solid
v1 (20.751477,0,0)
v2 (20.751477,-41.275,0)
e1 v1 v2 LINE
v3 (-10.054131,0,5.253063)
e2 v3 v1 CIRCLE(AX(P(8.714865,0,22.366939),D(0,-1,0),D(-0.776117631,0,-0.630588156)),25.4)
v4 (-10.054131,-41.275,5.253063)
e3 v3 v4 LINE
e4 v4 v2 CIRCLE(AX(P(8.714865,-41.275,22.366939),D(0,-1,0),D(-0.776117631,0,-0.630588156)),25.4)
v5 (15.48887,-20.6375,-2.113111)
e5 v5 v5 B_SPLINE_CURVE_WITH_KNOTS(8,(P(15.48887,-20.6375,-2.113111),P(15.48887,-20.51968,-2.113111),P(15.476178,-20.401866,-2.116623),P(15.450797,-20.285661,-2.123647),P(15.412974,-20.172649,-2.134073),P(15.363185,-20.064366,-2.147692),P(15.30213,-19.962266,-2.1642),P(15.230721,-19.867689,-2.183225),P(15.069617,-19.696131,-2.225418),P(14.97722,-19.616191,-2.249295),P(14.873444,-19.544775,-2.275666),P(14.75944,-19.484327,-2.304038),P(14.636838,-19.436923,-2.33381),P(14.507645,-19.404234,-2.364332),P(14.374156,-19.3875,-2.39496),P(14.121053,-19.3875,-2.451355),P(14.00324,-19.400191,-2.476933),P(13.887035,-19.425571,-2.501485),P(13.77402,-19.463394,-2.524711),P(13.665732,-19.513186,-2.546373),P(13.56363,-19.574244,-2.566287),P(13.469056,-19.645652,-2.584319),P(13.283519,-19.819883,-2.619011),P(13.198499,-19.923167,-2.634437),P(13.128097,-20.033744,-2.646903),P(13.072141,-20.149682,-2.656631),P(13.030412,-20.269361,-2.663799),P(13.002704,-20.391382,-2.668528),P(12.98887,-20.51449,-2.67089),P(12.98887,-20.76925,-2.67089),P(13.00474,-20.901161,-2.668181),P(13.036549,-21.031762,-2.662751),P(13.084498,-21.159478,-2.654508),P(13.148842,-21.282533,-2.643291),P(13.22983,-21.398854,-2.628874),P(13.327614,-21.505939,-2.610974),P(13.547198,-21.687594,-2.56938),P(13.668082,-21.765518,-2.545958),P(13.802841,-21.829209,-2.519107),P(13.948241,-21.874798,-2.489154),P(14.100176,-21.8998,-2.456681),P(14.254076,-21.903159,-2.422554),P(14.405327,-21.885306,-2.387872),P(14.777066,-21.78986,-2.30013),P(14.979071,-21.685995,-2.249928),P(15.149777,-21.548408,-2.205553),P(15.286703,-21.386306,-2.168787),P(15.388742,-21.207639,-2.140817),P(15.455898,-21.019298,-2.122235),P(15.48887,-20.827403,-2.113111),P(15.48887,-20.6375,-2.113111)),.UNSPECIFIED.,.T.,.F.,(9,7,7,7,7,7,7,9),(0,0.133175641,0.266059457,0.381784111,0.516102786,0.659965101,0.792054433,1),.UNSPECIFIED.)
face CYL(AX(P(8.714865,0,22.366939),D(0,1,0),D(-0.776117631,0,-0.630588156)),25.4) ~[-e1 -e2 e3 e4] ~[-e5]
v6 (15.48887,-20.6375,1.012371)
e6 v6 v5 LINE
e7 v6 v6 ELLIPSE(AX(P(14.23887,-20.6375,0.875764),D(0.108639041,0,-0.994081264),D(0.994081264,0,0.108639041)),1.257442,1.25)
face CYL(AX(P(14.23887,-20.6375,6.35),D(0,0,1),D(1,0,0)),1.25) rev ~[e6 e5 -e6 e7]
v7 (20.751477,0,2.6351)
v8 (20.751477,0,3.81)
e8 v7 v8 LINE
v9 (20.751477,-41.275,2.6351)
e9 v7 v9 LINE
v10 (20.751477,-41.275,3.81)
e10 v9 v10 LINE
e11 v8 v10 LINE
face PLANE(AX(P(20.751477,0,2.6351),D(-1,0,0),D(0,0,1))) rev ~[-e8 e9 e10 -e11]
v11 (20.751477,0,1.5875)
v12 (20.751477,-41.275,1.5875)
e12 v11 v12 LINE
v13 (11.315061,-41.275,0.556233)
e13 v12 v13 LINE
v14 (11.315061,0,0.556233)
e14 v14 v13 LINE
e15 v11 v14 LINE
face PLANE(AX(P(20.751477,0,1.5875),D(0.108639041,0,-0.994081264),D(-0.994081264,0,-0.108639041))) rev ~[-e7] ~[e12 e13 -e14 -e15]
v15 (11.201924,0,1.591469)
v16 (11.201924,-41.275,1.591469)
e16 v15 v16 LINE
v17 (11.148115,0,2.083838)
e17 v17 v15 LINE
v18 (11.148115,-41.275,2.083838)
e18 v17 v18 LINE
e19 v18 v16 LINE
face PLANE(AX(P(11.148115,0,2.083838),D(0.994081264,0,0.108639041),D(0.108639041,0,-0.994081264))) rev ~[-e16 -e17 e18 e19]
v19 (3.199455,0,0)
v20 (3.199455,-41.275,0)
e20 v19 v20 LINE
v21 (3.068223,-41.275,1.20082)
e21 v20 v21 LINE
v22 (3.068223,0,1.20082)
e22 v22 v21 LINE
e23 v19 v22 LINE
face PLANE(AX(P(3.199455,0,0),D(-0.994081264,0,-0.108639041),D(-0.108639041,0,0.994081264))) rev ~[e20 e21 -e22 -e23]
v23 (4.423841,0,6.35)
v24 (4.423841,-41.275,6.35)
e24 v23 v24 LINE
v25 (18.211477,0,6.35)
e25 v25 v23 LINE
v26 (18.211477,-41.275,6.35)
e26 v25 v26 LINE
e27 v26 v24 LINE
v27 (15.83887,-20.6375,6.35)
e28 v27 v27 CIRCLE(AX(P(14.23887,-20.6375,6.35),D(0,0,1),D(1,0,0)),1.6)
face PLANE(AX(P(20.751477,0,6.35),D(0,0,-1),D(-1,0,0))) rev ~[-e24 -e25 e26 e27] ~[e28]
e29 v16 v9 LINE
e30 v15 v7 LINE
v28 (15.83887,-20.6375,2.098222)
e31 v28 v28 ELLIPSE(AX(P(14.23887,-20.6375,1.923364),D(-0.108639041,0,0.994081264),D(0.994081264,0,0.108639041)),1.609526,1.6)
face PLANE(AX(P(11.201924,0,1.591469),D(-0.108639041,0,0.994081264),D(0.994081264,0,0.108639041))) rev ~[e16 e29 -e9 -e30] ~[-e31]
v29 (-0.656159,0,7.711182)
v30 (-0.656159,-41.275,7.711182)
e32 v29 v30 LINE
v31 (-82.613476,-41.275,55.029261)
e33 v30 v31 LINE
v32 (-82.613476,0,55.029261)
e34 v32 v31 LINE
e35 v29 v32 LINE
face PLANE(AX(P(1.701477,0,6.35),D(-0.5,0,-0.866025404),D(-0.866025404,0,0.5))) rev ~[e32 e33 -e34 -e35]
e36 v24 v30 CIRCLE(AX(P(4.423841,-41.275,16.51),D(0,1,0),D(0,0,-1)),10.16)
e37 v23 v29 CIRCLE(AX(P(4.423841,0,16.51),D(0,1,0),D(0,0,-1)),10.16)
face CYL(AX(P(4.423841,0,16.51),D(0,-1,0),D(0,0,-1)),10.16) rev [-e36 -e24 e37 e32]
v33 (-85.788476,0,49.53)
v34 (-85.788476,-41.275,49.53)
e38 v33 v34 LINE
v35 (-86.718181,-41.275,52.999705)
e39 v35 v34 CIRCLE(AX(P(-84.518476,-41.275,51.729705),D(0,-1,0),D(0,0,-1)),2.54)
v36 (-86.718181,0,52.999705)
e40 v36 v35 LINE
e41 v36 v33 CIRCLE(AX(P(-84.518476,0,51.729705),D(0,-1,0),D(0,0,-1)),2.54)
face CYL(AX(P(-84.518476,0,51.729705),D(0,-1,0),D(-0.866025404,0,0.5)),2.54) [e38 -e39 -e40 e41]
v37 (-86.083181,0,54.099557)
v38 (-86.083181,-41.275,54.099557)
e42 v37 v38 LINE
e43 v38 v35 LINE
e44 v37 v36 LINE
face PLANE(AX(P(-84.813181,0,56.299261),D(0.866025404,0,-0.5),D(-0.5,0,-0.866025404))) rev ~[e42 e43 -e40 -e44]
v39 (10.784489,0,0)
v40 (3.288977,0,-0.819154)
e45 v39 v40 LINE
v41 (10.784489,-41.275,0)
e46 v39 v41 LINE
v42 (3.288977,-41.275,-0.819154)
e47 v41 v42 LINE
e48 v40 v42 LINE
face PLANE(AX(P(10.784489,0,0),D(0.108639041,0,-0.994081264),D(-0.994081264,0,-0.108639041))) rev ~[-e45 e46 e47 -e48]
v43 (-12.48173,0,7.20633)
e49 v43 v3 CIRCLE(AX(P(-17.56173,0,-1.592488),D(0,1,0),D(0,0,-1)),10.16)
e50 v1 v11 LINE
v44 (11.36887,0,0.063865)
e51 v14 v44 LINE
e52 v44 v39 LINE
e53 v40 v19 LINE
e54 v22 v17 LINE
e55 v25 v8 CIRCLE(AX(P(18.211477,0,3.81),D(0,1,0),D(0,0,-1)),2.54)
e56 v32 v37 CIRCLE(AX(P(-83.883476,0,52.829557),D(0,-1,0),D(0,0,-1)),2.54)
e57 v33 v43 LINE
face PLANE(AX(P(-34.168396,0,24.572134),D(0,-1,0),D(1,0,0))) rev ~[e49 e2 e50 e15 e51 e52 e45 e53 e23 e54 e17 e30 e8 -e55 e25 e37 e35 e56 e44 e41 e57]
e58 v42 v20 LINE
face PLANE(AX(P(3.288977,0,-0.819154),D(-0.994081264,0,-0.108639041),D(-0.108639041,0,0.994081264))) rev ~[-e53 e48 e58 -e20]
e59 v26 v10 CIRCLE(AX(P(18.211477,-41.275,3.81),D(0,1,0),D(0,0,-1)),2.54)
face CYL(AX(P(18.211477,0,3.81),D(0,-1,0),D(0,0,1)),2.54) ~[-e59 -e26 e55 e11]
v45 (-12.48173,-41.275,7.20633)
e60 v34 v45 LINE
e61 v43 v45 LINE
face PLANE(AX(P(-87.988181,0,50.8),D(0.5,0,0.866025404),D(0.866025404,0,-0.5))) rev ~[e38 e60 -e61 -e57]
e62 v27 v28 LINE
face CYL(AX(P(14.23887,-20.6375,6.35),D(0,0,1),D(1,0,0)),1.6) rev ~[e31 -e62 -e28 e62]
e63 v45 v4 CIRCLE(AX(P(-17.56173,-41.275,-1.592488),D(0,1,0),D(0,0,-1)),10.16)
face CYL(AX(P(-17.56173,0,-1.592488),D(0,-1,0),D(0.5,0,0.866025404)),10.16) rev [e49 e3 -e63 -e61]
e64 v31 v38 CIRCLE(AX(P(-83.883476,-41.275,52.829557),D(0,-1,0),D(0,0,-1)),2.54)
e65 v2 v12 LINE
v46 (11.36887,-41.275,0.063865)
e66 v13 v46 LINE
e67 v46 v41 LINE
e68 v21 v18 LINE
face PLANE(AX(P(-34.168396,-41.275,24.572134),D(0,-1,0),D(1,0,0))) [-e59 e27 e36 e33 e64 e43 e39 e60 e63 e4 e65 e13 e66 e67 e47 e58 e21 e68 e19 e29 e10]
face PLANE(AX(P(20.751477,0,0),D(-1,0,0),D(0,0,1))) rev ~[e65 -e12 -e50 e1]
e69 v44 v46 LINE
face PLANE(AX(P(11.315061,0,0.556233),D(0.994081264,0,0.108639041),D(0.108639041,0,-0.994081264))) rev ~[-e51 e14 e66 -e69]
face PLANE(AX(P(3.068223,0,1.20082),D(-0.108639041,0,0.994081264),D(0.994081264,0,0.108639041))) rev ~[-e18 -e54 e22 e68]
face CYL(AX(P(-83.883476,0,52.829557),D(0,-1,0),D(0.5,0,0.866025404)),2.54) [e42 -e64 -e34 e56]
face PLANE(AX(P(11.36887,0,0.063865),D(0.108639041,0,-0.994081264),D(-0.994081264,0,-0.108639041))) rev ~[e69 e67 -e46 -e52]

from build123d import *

# Parameters (mm, degrees)
F1_DEPTH = 41.275
F2_R     = 1.6
F2_R_2   = 1.25
F3_DEPTH = 4.6024929371
F4_DEPTH = 9.3840608367
F6_R     = 10.16
F7_R     = 2.54


with BuildPart() as f1:
    # F0 (on Front) → F1 (new body)
    with BuildSketch(Plane.XZ):
        Polygon((-10.9985226281, 6.35), (0, 0), (3.1994554543, 0), (3.0682228412, 1.200819531), (11.1481153525, 2.0838376541), (11.2019242694, 1.5914692042), (20.7514773719, 2.6351004709), (20.7514773719, 6.35), (1.7014773719, 6.35), (-84.8131810245, 56.299261314), (-87.9881810245, 50.8), align=None)
        with BuildLine():
            Line((3.1994554543, 0), (0, 0))
            Line((0, 0), (-10.9985226281, 6.35))
            ThreePointArc((-10.9985226281, 6.35), (3.7335153721, -2.5398099993), (20.7514773719, 0))
            Line((20.7514773719, 0), (10.7844894565, 0))
            Line((10.7844894565, 0), (3.2889773719, -0.8191535968))
            Line((3.2889773719, -0.8191535968), (3.1994554543, 0))
        make_face()
        Polygon((10.7844894565, 0), (20.7514773719, 0), (20.7514773719, 1.5875), (11.3150609664, 0.5562329762), (11.3688698832, 0.0638645263), align=None)
    extrude(amount=F1_DEPTH)

    # F2 (on face) → F3 (cut, through all)
    with BuildSketch(Plane.XY.offset(6.35)):
        with Locations((14.2388698832, -20.6375)):
            Circle(F2_R)
        with Locations((14.2388698832, -20.6375)):
            Circle(F2_R_2, mode=Mode.SUBTRACT)
        with Locations((14.2388698832, -20.6375)):
            Circle(F2_R_2)
    extrude(amount=-F3_DEPTH, mode=Mode.SUBTRACT)

    # F2 (on face) → F4 (cut, through all)
    with BuildSketch(Plane.XY.offset(6.35)):
        with Locations((14.2388698832, -20.6375)):
            Circle(F2_R_2)
    extrude(amount=-F4_DEPTH, mode=Mode.SUBTRACT)

    # F6
    f6_edges = [f1.edges().sort_by_distance(p)[0] for p in [
        (-10.998523, -20.6375, 6.35),
        (1.701477, -20.6375, 6.35),
    ]]
    fillet(f6_edges, radius=F6_R)

    # F7
    f7_edges = [f1.edges().sort_by_distance(p)[0] for p in [
        (-87.988181, -20.6375, 50.8),
        (-84.813181, -20.6375, 56.299261),
        (20.751477, -20.6375, 6.35),
    ]]
    fillet(f7_edges, radius=F7_R)


solid = f1.part
